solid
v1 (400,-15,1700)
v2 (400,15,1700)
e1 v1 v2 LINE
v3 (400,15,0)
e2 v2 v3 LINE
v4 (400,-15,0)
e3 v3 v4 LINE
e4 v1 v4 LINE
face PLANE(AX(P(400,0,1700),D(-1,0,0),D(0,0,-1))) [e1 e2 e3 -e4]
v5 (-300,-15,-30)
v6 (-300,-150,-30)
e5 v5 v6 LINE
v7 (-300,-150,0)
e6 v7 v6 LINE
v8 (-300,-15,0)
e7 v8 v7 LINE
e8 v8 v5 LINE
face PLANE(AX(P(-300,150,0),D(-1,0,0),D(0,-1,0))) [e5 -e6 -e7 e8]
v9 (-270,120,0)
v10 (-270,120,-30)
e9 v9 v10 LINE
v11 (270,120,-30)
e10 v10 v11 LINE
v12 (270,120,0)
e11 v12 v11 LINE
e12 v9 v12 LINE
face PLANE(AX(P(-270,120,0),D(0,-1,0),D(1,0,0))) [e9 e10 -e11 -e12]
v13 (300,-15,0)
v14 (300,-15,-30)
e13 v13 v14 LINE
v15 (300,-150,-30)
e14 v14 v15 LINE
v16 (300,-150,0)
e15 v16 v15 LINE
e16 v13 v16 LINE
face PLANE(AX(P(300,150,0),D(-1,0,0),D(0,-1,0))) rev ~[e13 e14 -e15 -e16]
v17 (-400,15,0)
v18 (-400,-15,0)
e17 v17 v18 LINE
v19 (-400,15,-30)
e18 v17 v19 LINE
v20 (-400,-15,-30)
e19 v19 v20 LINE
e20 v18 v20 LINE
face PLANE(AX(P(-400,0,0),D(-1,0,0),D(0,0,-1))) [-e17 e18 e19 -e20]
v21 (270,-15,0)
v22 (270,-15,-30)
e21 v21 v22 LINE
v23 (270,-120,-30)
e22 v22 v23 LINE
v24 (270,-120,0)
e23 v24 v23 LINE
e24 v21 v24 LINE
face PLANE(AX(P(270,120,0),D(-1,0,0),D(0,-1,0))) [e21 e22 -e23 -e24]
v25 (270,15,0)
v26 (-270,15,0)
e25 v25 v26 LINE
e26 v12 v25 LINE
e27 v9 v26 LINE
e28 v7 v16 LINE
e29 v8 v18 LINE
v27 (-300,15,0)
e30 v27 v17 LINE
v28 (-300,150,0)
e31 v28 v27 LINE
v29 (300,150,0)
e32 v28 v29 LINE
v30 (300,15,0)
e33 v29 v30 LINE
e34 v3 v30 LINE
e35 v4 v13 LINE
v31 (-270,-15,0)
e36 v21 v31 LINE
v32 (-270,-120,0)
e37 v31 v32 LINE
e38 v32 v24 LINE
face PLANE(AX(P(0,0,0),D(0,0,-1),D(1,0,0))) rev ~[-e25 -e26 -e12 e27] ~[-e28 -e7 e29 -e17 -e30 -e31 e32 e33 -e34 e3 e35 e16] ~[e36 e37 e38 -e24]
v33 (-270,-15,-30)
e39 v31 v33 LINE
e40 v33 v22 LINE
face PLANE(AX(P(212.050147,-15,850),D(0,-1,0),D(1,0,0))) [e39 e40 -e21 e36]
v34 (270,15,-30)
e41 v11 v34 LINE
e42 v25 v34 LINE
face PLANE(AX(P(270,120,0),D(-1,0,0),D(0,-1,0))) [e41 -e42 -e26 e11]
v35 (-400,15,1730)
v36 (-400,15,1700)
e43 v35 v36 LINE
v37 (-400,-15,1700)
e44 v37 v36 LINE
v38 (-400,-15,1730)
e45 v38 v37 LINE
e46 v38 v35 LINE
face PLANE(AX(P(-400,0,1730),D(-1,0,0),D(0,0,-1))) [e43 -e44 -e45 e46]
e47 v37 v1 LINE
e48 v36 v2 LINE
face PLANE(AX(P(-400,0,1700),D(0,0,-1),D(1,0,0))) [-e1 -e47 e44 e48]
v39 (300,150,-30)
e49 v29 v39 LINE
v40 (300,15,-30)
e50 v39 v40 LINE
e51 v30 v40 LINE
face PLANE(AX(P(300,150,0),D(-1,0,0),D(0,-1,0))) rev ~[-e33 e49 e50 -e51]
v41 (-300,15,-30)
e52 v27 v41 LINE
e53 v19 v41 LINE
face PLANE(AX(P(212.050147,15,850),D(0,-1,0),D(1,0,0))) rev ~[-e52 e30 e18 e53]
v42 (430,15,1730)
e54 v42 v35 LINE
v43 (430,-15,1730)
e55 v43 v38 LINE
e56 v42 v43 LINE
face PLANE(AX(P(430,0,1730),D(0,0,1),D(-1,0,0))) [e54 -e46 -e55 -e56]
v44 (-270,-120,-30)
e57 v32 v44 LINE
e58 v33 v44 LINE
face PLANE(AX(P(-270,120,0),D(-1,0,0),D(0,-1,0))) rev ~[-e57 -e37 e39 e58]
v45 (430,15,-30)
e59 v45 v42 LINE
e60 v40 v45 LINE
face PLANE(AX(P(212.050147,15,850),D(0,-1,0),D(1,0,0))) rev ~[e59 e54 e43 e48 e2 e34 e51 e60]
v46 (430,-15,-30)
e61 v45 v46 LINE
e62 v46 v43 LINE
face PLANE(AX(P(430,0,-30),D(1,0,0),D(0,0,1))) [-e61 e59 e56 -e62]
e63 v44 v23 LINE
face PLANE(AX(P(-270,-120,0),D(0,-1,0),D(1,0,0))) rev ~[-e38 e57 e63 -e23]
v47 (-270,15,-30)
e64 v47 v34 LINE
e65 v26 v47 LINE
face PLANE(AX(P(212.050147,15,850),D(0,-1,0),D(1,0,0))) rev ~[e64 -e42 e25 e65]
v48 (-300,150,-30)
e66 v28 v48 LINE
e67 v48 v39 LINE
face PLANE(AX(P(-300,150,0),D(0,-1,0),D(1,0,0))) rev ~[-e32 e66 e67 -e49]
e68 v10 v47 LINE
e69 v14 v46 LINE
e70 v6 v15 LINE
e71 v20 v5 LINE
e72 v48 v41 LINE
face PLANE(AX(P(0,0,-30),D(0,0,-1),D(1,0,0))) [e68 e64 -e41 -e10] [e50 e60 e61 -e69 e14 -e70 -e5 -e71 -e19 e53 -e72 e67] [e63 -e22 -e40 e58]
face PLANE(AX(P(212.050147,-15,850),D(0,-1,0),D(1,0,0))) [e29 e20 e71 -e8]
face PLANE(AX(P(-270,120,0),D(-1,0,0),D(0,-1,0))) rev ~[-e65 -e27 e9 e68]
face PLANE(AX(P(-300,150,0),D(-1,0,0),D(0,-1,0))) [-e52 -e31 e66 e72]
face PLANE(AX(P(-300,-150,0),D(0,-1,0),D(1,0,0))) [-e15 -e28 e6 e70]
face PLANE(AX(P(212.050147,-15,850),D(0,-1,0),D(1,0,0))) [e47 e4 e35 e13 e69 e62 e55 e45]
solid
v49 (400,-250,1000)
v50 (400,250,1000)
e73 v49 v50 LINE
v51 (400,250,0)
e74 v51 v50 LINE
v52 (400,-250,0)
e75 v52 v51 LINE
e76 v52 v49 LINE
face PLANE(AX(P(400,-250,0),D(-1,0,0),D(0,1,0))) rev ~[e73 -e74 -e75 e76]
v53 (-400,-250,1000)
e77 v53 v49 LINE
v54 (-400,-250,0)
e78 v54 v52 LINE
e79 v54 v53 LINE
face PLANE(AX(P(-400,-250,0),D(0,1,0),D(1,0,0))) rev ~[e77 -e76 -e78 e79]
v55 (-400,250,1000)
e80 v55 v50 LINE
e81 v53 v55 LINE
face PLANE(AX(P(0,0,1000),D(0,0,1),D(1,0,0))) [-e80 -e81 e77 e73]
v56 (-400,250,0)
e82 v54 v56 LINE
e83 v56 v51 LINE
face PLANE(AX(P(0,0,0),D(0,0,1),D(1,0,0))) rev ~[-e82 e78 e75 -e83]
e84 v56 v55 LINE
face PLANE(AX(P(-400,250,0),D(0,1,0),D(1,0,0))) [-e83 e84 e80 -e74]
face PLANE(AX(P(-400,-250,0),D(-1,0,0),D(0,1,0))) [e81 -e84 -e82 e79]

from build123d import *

# Parameters (mm, degrees)
F0_W     = 800
F0_H     = 500
F1_DEPTH = 1000
F3_DEPTH = 15
F4_W     = 600
F4_H     = 300
F4_W_2   = 540
F4_H_2   = 240
F5_DEPTH = 30


with BuildPart() as f1:
    # F0 (on Top) → F1 (new body)
    with BuildSketch(Plane.XY):
        Rectangle(F0_W, F0_H)
    extrude(amount=F1_DEPTH)


with BuildPart() as f3:
    # F2 (on Front) → F3 (new body, symmetric)
    with BuildSketch(Plane.XZ):
        Polygon((400, 1700), (400, 0), (-400, 0), (-400, -30), (430, -30), (430, 1730), (-400, 1730), (-400, 1700), align=None)
    extrude(amount=F3_DEPTH, both=True)

    # F4 (on face) → F5 (join)
    with BuildSketch(Plane(origin=(0, 0, 0), x_dir=(1, 0, 0), z_dir=(0, 0, -1))):
        Rectangle(F4_W, F4_H)
        Rectangle(F4_W_2, F4_H_2, mode=Mode.SUBTRACT)
    extrude(amount=F5_DEPTH)


solid = Compound([f1.part, f3.part])
